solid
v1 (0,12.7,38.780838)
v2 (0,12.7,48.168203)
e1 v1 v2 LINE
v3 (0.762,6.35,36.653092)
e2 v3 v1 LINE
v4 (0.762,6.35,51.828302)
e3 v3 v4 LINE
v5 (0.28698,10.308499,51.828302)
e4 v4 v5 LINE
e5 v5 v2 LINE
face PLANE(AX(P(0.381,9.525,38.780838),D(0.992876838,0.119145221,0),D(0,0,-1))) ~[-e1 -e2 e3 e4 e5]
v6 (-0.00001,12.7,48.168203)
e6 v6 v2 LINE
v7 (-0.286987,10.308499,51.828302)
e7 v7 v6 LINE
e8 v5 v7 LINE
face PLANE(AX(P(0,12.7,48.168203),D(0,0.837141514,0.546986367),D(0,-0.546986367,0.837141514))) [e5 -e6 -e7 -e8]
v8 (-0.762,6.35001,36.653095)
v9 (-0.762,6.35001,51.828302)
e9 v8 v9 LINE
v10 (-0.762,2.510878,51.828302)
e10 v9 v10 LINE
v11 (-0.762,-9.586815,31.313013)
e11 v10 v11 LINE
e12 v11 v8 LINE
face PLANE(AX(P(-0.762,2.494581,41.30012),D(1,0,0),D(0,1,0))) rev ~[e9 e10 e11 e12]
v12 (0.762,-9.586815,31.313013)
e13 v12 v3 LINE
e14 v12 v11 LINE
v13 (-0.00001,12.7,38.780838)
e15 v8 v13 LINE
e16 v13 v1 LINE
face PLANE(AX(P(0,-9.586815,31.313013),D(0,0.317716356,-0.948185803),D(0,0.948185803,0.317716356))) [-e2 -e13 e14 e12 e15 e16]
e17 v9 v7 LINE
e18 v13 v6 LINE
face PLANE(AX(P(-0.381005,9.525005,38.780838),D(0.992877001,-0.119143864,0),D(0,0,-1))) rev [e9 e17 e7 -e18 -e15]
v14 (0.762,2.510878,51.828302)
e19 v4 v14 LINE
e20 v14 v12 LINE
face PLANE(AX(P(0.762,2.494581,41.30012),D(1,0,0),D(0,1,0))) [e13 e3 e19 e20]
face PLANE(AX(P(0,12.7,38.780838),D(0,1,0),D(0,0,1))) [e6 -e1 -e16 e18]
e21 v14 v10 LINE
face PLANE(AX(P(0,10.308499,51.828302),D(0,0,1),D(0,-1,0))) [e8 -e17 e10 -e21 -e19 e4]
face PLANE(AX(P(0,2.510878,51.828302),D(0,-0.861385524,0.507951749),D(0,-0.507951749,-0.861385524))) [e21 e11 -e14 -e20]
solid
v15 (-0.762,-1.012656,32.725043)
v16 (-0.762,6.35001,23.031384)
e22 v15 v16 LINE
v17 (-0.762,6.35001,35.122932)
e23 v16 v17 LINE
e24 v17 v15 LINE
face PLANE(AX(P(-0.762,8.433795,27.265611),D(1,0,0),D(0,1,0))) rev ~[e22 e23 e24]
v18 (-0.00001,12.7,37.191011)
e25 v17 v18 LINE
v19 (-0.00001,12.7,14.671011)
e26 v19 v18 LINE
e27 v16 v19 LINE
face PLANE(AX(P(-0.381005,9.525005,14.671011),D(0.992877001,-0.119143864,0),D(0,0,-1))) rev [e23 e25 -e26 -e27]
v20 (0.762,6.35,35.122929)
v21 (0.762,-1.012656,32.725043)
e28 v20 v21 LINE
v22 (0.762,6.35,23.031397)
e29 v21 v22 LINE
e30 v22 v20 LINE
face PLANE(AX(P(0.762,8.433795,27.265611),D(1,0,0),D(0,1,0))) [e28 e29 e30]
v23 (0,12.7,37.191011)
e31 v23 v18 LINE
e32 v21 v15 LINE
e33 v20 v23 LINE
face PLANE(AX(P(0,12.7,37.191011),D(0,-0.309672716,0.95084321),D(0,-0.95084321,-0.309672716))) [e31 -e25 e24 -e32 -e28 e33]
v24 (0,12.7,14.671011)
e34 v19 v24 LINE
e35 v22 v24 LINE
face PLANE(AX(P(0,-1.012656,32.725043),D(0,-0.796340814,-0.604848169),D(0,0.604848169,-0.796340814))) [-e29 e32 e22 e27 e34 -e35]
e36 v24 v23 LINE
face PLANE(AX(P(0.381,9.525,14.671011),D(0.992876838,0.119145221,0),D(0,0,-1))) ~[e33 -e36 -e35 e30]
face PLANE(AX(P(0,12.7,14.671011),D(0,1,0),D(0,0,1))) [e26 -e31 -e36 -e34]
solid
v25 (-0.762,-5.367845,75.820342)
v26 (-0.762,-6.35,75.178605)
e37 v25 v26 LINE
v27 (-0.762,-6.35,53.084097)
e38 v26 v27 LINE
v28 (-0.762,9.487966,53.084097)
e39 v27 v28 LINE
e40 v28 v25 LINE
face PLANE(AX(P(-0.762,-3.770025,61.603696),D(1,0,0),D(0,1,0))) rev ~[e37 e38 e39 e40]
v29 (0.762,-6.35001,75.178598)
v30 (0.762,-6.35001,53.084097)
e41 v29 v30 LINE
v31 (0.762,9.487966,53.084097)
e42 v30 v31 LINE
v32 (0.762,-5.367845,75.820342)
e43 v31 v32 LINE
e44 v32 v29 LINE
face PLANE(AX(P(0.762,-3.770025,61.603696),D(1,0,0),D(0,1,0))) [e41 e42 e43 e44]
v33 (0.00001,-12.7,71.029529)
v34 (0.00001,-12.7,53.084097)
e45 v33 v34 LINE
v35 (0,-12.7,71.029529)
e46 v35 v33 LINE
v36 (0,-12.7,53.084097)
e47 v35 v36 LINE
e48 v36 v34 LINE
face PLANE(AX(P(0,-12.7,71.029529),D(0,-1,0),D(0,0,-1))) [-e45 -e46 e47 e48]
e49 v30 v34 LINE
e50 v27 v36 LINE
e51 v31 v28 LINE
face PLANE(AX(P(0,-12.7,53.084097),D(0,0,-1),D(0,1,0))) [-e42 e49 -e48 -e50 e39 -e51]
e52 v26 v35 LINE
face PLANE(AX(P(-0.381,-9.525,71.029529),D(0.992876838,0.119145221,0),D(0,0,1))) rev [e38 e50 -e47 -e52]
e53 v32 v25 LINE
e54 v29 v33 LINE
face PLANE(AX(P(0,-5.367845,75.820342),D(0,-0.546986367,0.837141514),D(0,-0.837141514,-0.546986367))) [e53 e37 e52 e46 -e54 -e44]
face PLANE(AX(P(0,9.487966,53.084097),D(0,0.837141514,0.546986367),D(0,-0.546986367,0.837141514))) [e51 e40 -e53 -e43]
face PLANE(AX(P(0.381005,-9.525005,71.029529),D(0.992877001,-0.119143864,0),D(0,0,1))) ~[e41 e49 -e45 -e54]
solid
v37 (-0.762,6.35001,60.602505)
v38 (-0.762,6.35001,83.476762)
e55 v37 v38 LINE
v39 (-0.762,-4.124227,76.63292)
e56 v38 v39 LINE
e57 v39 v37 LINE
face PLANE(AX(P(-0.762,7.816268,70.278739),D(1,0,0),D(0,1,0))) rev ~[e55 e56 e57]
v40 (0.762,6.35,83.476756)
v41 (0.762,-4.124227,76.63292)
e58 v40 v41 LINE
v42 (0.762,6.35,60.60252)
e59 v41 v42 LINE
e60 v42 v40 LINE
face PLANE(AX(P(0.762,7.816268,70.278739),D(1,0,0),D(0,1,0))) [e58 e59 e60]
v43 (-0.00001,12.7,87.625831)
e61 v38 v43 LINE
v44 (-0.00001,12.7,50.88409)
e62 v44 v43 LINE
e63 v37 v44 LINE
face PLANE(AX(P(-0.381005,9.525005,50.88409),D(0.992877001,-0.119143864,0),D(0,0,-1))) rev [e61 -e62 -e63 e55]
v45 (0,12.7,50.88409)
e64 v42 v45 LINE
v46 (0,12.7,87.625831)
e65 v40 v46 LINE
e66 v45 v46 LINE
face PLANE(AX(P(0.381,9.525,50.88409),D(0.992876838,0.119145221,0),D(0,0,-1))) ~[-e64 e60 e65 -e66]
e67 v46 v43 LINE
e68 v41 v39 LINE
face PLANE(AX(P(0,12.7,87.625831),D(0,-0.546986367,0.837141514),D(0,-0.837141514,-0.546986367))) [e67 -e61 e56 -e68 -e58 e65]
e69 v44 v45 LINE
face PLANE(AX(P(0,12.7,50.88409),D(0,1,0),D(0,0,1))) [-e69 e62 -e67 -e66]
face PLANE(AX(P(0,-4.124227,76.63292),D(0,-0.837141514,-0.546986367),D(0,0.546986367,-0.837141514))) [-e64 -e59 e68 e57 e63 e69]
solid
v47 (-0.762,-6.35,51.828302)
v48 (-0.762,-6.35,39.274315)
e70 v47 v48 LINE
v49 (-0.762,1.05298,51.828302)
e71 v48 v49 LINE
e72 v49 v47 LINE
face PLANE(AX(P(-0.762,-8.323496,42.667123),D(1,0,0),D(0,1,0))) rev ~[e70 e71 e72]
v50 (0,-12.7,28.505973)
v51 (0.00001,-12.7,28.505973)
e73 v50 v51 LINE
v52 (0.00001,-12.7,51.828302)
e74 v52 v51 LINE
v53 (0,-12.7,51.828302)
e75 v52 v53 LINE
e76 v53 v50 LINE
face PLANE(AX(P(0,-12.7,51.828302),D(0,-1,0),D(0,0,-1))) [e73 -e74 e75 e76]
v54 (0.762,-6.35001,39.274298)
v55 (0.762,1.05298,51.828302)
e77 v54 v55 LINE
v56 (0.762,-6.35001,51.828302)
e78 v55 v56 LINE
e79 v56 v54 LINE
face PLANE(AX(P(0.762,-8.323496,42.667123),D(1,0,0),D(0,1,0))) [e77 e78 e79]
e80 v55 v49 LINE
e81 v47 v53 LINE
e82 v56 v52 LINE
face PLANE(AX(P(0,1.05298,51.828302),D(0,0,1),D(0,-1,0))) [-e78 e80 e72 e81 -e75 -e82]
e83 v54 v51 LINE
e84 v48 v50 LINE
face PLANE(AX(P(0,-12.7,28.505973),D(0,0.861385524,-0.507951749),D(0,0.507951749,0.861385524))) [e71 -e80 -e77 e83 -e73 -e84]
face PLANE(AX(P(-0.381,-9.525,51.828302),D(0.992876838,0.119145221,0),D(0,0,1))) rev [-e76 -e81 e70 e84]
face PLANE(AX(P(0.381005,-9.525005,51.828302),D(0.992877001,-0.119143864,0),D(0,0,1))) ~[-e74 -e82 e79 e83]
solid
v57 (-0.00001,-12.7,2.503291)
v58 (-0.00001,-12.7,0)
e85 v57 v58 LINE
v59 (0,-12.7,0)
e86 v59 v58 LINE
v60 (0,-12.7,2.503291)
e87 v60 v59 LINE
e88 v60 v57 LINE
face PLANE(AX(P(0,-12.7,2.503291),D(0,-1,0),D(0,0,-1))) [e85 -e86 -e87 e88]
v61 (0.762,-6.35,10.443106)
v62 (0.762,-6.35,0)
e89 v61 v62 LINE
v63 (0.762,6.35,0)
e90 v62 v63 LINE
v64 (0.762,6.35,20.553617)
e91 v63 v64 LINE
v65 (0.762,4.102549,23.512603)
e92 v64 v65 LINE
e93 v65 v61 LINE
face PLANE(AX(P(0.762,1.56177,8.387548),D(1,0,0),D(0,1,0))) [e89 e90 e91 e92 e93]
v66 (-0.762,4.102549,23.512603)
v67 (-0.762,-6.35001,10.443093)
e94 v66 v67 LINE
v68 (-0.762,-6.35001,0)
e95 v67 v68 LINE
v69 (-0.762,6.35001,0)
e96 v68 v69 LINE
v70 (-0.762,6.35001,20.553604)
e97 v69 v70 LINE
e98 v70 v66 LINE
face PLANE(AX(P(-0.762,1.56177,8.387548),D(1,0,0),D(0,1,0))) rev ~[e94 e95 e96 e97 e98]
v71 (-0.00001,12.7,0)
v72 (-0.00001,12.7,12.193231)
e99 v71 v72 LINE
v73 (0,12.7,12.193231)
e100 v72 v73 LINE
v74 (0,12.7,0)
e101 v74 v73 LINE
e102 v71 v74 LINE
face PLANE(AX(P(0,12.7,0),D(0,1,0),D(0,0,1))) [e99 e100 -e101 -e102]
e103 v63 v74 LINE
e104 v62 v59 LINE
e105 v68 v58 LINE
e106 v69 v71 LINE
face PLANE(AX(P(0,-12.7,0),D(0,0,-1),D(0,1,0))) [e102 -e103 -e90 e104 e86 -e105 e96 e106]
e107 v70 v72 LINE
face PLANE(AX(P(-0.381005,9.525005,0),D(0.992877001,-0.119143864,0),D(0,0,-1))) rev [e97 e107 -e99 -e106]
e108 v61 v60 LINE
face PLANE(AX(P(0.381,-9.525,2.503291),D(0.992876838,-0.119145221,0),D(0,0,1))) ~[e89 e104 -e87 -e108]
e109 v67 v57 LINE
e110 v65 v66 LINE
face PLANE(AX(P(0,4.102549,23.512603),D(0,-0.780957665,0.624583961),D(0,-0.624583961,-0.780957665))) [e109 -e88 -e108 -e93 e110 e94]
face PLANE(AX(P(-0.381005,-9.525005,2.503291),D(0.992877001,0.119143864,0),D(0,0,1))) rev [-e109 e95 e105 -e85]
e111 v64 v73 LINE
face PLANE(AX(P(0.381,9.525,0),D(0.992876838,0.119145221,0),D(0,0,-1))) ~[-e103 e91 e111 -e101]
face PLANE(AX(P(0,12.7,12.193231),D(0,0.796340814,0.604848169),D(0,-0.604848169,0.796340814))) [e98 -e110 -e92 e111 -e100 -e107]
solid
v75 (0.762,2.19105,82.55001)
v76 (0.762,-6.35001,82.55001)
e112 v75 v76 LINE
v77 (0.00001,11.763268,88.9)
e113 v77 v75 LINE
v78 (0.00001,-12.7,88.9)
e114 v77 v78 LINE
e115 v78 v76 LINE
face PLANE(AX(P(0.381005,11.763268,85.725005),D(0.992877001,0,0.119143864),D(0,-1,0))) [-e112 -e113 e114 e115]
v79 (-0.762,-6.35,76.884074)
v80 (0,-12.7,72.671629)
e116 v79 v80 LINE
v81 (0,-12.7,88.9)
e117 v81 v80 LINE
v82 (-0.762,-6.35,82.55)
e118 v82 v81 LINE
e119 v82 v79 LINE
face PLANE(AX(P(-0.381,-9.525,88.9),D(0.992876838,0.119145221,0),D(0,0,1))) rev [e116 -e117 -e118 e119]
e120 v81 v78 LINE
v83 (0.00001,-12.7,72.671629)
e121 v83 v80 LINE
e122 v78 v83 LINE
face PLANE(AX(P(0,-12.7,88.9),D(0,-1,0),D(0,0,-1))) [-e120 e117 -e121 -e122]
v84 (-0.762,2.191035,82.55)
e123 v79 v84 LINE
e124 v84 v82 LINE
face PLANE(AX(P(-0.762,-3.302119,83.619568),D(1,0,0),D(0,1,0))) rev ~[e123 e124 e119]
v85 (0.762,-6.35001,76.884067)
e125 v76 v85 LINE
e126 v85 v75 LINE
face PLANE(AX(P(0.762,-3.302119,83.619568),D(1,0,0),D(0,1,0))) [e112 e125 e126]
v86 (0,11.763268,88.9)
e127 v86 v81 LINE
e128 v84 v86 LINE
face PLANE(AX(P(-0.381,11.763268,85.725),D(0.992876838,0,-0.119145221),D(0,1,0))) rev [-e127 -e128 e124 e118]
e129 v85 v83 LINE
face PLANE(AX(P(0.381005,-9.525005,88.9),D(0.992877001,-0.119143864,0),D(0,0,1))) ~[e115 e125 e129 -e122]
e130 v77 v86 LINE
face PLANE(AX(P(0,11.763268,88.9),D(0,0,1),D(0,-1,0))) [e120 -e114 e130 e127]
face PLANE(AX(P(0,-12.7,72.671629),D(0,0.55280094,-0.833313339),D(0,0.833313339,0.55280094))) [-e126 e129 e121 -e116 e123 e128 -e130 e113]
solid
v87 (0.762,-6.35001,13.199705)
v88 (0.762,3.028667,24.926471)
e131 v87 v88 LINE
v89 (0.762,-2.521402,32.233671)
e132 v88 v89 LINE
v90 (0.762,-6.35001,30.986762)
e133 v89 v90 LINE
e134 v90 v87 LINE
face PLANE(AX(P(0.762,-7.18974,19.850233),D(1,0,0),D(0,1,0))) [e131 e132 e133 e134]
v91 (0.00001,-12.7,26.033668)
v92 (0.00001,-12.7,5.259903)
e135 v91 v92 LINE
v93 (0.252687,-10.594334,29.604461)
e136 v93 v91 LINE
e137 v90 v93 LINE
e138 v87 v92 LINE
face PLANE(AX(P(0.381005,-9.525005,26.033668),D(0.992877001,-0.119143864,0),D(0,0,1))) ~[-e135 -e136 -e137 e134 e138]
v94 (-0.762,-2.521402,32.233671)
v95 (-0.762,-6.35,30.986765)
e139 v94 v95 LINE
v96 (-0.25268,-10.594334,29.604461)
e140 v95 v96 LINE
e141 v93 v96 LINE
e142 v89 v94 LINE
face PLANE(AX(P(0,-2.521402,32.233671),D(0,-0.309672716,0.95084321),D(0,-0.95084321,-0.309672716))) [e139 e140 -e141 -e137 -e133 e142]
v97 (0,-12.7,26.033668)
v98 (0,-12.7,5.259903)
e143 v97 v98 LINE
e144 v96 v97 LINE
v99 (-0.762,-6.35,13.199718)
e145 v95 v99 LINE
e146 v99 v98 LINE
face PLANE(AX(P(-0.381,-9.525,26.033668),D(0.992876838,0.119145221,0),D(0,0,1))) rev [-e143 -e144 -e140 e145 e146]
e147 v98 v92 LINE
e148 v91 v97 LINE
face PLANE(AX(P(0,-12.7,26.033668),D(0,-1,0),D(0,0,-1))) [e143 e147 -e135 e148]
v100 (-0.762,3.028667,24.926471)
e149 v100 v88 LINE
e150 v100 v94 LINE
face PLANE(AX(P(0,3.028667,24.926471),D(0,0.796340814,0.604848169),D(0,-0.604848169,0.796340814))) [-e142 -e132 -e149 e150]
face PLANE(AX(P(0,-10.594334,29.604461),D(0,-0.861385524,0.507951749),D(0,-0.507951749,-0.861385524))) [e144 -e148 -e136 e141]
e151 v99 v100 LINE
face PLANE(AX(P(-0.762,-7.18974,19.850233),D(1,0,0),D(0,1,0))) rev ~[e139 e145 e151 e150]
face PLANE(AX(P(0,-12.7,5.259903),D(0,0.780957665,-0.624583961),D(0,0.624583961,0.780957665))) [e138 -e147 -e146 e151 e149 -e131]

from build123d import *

# Parameters (mm, degrees)
F1_DEPTH    = 0.762
F2_SIZE2    = 0.762
F2_SIZE     = 6.35
F2_2_SIZE2  = 0.76199
F2_2_SIZE   = 6.34999
F2_3_SIZE2  = 0.762
F2_3_SIZE   = 6.35
F2_4_SIZE2  = 0.76199
F2_4_SIZE   = 6.34999
F2_5_SIZE2  = 0.762
F2_5_SIZE   = 6.35
F2_6_SIZE2  = 0.76199
F2_6_SIZE   = 6.34999
F2_7_SIZE2  = 0.762
F2_7_SIZE   = 6.35
F2_8_SIZE2  = 0.76199
F2_8_SIZE   = 6.34999
F2_9_SIZE2  = 0.762
F2_9_SIZE   = 6.35
F2_10_SIZE2 = 0.76199
F2_10_SIZE  = 6.34999
F2_11_SIZE2 = 0.762
F2_11_SIZE  = 6.35
F2_12_SIZE2 = 0.76199
F2_12_SIZE  = 6.34999
F2_13_SIZE2 = 0.762
F2_13_SIZE  = 6.35
F2_14_SIZE2 = 0.76199
F2_14_SIZE  = 6.34999
F2_15_SIZE2 = 0.762
F2_15_SIZE  = 6.35
F2_16_SIZE2 = 0.76199
F2_16_SIZE  = 6.34999
F3_SIZE2    = 6.34999
F3_SIZE     = 0.76199


# Not quite as in the source:
# - a fillet or chamfer is up to 0.001 mm smaller than in the source, because OpenCascade refuses the exact size


with BuildPart() as f1:
    # F0 (on Right) → F1 (new body, symmetric)
    with BuildSketch(Plane.YZ):
        Polygon((-12.7, 51.828302443), (-12.7, 28.5059732678), (1.0529800206, 51.828302443), align=None)
    extrude(amount=F1_DEPTH, both=True)

    # F2#13
    f2_13_edges = [f1.edges().sort_by_distance(p)[0] for p in [
        (-0.762, -12.7, 40.167138),
    ]]
    f2_13_side = f1.faces().sort_by_distance((-0.762, -8.115673, 44.054193))[0]
    chamfer(f2_13_edges, length=F2_13_SIZE, length2=F2_13_SIZE2, reference=f2_13_side)

    # F2#14 (size 6.35 and 0.762 in the source; OpenCascade refuses exactly that, so slightly less here)
    f2_14_edges = [f1.edges().sort_by_distance(p)[0] for p in [
        (0.762, -12.7, 40.167138),
    ]]
    f2_14_side = f1.faces().sort_by_distance((0.762, -8.115673, 44.054193))[0]
    chamfer(f2_14_edges, length=F2_14_SIZE, length2=F2_14_SIZE2, reference=f2_14_side)


with BuildPart() as f1b:
    # F0 (on Right) → F1, piece 2 (new body, symmetric)
    with BuildSketch(Plane.YZ):
        Polygon((-12.7, 26.0336679026), (-12.7, 5.2599026822), (3.0286672094, 24.9264711231), (-2.5214019575, 32.2336712183), (-10.594333522, 29.6044610441), align=None)
    extrude(amount=F1_DEPTH, both=True)

    # F2#15
    f2_15_edges = [f1b.edges().sort_by_distance(p)[0] for p in [
        (-0.762, -12.7, 15.646785),
    ]]
    f2_15_side = f1b.faces().sort_by_distance((-0.762, -6.710937, 21.407423))[0]
    chamfer(f2_15_edges, length=F2_15_SIZE, length2=F2_15_SIZE2, reference=f2_15_side)

    # F2#16 (size 6.35 and 0.762 in the source; OpenCascade refuses exactly that, so slightly less here)
    f2_16_edges = [f1b.edges().sort_by_distance(p)[0] for p in [
        (0.762, -12.7, 15.646785),
    ]]
    f2_16_side = f1b.faces().sort_by_distance((0.762, -6.710937, 21.407423))[0]
    chamfer(f2_16_edges, length=F2_16_SIZE, length2=F2_16_SIZE2, reference=f2_16_side)


with BuildPart() as f1c:
    # F0 (on Right) → F1, piece 3 (new body, symmetric)
    with BuildSketch(Plane.YZ):
        Polygon((-4.1242268054, 76.6329197301), (12.7, 50.884090213), (12.7, 87.6258313656), align=None)
    extrude(amount=F1_DEPTH, both=True)

    # F2#3
    f2_3_edges = [f1c.edges().sort_by_distance(p)[0] for p in [
        (0.762, 12.7, 69.254961),
    ]]
    f2_3_side = f1c.faces().sort_by_distance((0.762, 7.091924, 71.71428))[0]
    chamfer(f2_3_edges, length=F2_3_SIZE, length2=F2_3_SIZE2, reference=f2_3_side)

    # F2#4 (size 6.35 and 0.762 in the source; OpenCascade refuses exactly that, so slightly less here)
    f2_4_edges = [f1c.edges().sort_by_distance(p)[0] for p in [
        (-0.762, 12.7, 69.254961),
    ]]
    f2_4_side = f1c.faces().sort_by_distance((-0.762, 7.091924, 71.71428))[0]
    chamfer(f2_4_edges, length=F2_4_SIZE, length2=F2_4_SIZE2, reference=f2_4_side)


with BuildPart() as f1d:
    # F0 (on Right) → F1, piece 4 (new body, symmetric)
    with BuildSketch(Plane.YZ):
        Polygon((-9.5868147053, 31.313013333), (12.7, 38.7808382511), (12.7, 48.1682026787), (10.3084991155, 51.828302443), (2.510877559, 51.828302443), align=None)
    extrude(amount=F1_DEPTH, both=True)

    # F2
    f2_edges = [f1d.edges().sort_by_distance(p)[0] for p in [
        (0.762, 12.7, 43.47452),
    ]]
    f2_side = f1d.faces().sort_by_distance((0.762, 3.707113, 42.31436))[0]
    chamfer(f2_edges, length=F2_SIZE, length2=F2_SIZE2, reference=f2_side)

    # F2#2 (size 6.35 and 0.762 in the source; OpenCascade refuses exactly that, so slightly less here)
    f2_2_edges = [f1d.edges().sort_by_distance(p)[0] for p in [
        (-0.762, 12.7, 43.47452),
    ]]
    f2_2_side = f1d.faces().sort_by_distance((-0.762, 3.707113, 42.31436))[0]
    chamfer(f2_2_edges, length=F2_2_SIZE, length2=F2_2_SIZE2, reference=f2_2_side)


with BuildPart() as f1e:
    # F0 (on Right) → F1, piece 5 (new body, symmetric)
    with BuildSketch(Plane.YZ):
        Polygon((-1.0126563937, 32.7250428043), (12.7, 14.6710112068), (12.7, 37.1910110116), align=None)
    extrude(amount=F1_DEPTH, both=True)

    # F2#5
    f2_5_edges = [f1e.edges().sort_by_distance(p)[0] for p in [
        (0.762, 12.7, 25.931011),
    ]]
    f2_5_side = f1e.faces().sort_by_distance((0.762, 8.129115, 28.195688))[0]
    chamfer(f2_5_edges, length=F2_5_SIZE, length2=F2_5_SIZE2, reference=f2_5_side)

    # F2#6 (size 6.35 and 0.762 in the source; OpenCascade refuses exactly that, so slightly less here)
    f2_6_edges = [f1e.edges().sort_by_distance(p)[0] for p in [
        (-0.762, 12.7, 25.931011),
    ]]
    f2_6_side = f1e.faces().sort_by_distance((-0.762, 8.129115, 28.195688))[0]
    chamfer(f2_6_edges, length=F2_6_SIZE, length2=F2_6_SIZE2, reference=f2_6_side)


with BuildPart() as f1f:
    # F0 (on Right) → F1, piece 6 (new body, symmetric)
    with BuildSketch(Plane.YZ):
        Polygon((-12.7, 0), (0, 0), (12.7, 0), (12.7, 12.1932309121), (4.1025487481, 23.5126027467), (-12.7, 2.5032908618), align=None)
    extrude(amount=F1_DEPTH, both=True)

    # F2#7
    f2_7_edges = [f1f.edges().sort_by_distance(p)[0] for p in [
        (0.762, 12.7, 6.096615),
        (0.762, -12.7, 1.251645),
    ]]
    f2_7_side = f1f.faces().sort_by_distance((0.762, 2.081715, 8.457296))[0]
    chamfer(f2_7_edges, length=F2_7_SIZE, length2=F2_7_SIZE2, reference=f2_7_side)

    # F2#8 (size 6.35 and 0.762 in the source; OpenCascade refuses exactly that, so slightly less here)
    f2_8_edges = [f1f.edges().sort_by_distance(p)[0] for p in [
        (-0.762, -12.7, 1.251645),
        (-0.762, 12.7, 6.096615),
    ]]
    f2_8_side = f1f.faces().sort_by_distance((-0.762, 2.081715, 8.457296))[0]
    chamfer(f2_8_edges, length=F2_8_SIZE, length2=F2_8_SIZE2, reference=f2_8_side)


with BuildPart() as f1g:
    # F0 (on Right) → F1, piece 7 (new body, symmetric)
    with BuildSketch(Plane.YZ):
        Polygon((11.7632681504, 88.9), (-12.7, 88.9), (-12.7, 72.6716294885), align=None)
    extrude(amount=F1_DEPTH, both=True)

    # F2#9
    f2_9_edges = [f1g.edges().sort_by_distance(p)[0] for p in [
        (-0.762, -12.7, 80.785815),
        (-0.762, -0.468366, 88.9),
    ]]
    f2_9_side = f1g.faces().sort_by_distance((-0.762, -4.545577, 83.490543))[0]
    chamfer(f2_9_edges, length=F2_9_SIZE, length2=F2_9_SIZE2, reference=f2_9_side)

    # F2#10 (size 6.35 and 0.762 in the source; OpenCascade refuses exactly that, so slightly less here)
    f2_10_edges = [f1g.edges().sort_by_distance(p)[0] for p in [
        (0.762, -12.7, 80.785815),
    ]]
    f2_10_side = f1g.faces().sort_by_distance((0.762, -4.545577, 83.490543))[0]
    chamfer(f2_10_edges, length=F2_10_SIZE, length2=F2_10_SIZE2, reference=f2_10_side)

    # F3 (size 0.762 and 6.35 in the source; OpenCascade refuses exactly that, so slightly less here)
    f3_edges = [f1g.edges().sort_by_distance(p)[0] for p in [
        (0.762, 2.706629, 88.9),
    ]]
    f3_side = f1g.faces().sort_by_distance((0.362059, 1.040187, 88.9))[0]
    chamfer(f3_edges, length=F3_SIZE, length2=F3_SIZE2, reference=f3_side)


with BuildPart() as f1h:
    # F0 (on Right) → F1, piece 8 (new body, symmetric)
    with BuildSketch(Plane.YZ):
        Polygon((-5.3678452737, 75.8203422436), (-12.7, 71.0295289755), (-12.7, 53.0840971504), (9.487965702, 53.0840971504), align=None)
    extrude(amount=F1_DEPTH, both=True)

    # F2#11
    f2_11_edges = [f1h.edges().sort_by_distance(p)[0] for p in [
        (-0.762, -12.7, 62.056813),
    ]]
    f2_11_side = f1h.faces().sort_by_distance((-0.762, -4.389957, 61.900294))[0]
    chamfer(f2_11_edges, length=F2_11_SIZE, length2=F2_11_SIZE2, reference=f2_11_side)

    # F2#12 (size 6.35 and 0.762 in the source; OpenCascade refuses exactly that, so slightly less here)
    f2_12_edges = [f1h.edges().sort_by_distance(p)[0] for p in [
        (0.762, -12.7, 62.056813),
    ]]
    f2_12_side = f1h.faces().sort_by_distance((0.762, -4.389957, 61.900294))[0]
    chamfer(f2_12_edges, length=F2_12_SIZE, length2=F2_12_SIZE2, reference=f2_12_side)


solid = Compound([f1.part, f1b.part, f1c.part, f1d.part, f1e.part, f1f.part, f1g.part, f1h.part])
